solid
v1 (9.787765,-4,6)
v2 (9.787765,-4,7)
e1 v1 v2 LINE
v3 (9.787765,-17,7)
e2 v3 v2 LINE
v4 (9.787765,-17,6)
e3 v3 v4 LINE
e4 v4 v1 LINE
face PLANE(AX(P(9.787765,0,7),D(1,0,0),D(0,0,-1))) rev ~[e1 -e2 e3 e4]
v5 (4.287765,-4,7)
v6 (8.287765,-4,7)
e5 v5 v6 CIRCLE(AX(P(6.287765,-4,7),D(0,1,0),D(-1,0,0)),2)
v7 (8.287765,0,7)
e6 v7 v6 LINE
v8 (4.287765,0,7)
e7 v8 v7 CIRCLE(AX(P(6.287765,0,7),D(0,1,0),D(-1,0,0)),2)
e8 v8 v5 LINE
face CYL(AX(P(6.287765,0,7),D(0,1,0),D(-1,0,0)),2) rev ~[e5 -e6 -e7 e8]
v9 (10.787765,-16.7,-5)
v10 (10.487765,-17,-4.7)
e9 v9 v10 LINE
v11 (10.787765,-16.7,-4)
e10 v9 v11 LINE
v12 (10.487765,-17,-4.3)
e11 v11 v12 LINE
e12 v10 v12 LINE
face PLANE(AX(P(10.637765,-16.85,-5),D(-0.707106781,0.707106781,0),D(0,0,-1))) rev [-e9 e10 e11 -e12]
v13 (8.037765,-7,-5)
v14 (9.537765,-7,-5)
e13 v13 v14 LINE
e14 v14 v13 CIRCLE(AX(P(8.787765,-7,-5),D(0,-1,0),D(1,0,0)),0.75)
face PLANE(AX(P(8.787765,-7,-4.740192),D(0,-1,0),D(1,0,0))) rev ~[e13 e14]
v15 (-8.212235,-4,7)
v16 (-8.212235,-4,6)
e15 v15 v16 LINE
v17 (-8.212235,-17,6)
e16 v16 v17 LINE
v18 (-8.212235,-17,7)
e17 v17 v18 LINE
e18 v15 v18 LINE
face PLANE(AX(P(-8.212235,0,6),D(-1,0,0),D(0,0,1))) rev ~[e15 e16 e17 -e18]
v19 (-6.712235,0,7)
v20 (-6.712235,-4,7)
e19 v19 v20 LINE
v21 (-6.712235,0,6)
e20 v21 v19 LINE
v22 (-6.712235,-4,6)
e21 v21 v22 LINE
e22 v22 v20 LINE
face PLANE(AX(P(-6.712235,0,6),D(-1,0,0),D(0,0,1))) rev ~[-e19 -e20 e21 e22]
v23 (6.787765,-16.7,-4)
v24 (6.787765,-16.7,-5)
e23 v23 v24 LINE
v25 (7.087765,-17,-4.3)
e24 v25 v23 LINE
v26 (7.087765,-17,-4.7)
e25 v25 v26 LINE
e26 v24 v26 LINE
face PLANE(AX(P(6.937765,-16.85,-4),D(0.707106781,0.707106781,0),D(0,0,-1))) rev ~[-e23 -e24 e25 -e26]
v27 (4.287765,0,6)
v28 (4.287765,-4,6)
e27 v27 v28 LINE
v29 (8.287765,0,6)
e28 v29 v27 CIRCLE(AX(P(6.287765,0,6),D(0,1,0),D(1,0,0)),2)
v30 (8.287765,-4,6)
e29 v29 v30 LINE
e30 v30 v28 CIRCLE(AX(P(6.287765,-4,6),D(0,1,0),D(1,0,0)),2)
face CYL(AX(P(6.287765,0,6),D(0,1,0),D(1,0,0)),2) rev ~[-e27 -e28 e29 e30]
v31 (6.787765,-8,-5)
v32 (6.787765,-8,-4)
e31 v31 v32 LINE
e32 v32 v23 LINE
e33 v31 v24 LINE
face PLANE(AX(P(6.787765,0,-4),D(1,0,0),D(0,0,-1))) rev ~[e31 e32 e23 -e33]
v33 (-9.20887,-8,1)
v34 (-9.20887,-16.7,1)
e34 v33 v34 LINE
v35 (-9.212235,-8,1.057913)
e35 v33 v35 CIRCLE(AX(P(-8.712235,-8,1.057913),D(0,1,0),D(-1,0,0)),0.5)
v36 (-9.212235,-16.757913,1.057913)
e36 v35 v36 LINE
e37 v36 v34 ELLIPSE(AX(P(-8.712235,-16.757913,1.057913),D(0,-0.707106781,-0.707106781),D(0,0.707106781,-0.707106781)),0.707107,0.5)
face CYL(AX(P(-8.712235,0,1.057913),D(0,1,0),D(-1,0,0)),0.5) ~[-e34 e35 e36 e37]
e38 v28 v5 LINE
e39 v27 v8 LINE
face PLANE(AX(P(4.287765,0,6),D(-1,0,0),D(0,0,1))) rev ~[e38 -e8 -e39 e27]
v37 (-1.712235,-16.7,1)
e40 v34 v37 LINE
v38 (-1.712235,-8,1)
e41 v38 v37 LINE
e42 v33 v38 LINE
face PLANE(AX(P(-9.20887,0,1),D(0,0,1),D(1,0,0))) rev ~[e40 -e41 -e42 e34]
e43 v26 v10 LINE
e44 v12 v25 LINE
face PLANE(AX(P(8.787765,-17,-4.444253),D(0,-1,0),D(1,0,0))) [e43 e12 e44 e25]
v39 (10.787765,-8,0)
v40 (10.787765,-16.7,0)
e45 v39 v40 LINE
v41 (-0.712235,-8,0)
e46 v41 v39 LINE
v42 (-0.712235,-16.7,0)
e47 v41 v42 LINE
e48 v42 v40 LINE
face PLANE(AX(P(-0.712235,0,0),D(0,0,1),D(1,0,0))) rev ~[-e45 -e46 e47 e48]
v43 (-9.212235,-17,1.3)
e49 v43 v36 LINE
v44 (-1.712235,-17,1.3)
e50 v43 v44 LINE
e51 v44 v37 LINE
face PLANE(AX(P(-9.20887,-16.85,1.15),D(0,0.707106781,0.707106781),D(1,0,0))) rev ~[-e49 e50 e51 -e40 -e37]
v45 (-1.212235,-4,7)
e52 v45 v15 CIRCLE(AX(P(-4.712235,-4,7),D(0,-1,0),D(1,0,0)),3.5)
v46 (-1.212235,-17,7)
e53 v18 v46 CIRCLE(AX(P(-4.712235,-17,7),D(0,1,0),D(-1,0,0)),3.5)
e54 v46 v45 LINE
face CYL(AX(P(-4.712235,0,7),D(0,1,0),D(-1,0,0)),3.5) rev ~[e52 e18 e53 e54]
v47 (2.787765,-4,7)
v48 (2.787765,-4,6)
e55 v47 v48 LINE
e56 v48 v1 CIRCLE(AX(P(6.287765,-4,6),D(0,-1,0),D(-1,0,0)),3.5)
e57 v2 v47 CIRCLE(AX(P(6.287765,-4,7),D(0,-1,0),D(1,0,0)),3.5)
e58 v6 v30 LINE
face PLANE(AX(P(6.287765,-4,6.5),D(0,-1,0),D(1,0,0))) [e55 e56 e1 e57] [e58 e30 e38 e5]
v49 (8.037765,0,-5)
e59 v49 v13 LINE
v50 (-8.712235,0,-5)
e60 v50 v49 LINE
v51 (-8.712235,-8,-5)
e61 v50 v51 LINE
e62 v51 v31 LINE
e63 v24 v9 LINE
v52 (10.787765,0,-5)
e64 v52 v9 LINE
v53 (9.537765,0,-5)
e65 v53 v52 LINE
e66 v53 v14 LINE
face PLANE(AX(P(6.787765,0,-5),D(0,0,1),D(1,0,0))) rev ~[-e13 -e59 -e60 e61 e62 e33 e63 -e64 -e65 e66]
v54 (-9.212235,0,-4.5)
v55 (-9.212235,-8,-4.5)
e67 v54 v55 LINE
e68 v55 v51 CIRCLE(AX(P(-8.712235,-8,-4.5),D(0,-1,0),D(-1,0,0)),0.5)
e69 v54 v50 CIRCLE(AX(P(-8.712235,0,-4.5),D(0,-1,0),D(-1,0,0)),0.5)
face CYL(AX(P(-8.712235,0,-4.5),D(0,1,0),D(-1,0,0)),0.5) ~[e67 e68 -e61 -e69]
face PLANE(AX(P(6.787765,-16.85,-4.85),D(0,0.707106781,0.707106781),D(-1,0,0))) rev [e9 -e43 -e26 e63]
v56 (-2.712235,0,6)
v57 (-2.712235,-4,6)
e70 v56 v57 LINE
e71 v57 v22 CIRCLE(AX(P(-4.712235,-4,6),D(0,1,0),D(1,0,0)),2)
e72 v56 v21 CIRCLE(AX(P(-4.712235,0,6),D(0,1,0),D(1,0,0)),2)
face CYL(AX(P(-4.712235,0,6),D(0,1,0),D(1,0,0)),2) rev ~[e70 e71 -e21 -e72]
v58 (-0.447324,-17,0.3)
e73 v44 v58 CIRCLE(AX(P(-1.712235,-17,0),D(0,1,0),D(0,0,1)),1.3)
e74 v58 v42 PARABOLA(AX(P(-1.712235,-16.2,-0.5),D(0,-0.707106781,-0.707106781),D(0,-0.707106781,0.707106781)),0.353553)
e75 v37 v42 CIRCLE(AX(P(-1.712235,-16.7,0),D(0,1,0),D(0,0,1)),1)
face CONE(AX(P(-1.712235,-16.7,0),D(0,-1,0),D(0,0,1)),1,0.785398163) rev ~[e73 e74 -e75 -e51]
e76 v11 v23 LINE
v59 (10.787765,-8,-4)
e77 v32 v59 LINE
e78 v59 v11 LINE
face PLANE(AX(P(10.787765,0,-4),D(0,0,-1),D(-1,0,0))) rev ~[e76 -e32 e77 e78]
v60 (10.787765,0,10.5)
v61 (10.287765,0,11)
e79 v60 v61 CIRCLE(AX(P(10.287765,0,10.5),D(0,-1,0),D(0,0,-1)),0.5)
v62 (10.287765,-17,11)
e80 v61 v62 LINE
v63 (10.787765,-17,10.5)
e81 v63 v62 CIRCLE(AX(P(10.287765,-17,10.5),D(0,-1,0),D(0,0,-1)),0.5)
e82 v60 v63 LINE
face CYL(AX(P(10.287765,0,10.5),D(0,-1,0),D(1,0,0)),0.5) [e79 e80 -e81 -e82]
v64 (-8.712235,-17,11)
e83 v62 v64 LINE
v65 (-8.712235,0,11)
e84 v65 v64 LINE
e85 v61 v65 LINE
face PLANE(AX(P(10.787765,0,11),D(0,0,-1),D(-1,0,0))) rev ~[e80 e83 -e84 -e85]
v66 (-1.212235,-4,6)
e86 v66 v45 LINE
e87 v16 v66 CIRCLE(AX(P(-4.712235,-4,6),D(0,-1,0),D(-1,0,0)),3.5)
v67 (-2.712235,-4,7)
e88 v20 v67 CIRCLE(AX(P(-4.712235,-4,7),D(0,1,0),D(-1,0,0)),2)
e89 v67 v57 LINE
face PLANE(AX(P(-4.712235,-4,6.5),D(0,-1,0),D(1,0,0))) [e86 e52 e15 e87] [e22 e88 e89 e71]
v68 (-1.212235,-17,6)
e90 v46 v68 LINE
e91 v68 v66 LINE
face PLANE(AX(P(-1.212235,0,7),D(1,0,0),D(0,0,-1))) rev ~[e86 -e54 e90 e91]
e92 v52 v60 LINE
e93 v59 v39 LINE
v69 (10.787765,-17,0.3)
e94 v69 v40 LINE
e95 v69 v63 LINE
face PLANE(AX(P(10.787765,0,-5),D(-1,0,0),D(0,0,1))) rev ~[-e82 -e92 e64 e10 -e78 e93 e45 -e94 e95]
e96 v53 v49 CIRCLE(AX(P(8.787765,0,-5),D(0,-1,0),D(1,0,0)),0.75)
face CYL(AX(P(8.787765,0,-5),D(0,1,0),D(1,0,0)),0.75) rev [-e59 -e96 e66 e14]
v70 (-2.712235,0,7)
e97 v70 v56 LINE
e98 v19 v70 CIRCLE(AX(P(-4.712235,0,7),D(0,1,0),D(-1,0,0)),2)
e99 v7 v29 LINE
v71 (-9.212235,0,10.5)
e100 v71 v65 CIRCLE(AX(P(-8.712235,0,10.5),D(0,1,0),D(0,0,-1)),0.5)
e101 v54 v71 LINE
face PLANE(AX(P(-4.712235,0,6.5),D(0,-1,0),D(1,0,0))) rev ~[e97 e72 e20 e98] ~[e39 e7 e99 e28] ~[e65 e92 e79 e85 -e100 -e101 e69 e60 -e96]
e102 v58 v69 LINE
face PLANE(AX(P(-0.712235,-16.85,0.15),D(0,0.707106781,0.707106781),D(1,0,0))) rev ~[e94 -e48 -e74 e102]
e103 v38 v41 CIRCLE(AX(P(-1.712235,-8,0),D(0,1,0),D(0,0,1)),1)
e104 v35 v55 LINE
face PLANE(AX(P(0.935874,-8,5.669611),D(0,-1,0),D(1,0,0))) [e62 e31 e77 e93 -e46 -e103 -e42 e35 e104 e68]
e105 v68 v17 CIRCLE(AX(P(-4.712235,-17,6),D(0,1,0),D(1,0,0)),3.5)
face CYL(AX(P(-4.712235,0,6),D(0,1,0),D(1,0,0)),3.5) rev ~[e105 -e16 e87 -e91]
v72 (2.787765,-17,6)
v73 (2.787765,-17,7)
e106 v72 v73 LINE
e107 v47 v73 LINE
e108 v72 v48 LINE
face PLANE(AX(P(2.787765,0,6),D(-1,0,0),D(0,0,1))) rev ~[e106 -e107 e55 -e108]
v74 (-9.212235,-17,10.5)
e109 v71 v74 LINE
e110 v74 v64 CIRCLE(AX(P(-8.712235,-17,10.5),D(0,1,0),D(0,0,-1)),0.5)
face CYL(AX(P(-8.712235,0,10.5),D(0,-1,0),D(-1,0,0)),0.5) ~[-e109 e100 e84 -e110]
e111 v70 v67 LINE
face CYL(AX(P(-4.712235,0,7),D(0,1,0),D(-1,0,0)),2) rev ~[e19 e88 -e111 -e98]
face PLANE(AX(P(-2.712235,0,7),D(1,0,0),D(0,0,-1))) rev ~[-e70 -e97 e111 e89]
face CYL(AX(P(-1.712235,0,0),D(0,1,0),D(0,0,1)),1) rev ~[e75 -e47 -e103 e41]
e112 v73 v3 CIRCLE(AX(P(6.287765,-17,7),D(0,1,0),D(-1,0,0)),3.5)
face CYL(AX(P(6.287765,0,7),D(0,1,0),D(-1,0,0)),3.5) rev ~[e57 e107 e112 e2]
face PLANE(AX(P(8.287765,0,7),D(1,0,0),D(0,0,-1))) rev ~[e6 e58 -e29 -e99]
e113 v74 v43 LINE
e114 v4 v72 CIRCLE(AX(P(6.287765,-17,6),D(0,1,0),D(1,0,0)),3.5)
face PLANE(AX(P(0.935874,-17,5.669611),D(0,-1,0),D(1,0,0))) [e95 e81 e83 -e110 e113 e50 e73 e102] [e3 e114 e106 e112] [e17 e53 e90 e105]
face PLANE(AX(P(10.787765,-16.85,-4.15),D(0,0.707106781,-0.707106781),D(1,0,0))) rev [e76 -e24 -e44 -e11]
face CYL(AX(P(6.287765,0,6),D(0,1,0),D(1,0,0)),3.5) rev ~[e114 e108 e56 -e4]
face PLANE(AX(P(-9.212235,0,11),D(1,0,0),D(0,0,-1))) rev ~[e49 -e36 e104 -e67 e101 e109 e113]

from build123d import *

# Parameters (mm, degrees)
F1_DEPTH = 17
F2_DEPTH = 8
F3_DEPTH = 17
F4_R     = 0.5
F5_DEPTH = 4
F6_SIZE  = 0.3
F7_DEPTH = 7
F8_DEPTH = 4


with BuildPart() as f1:
    # F0 (on Front) → F1 (new body)
    with BuildSketch(Plane.XZ):
        with BuildLine():
            Line((10.7877647579, 0), (10.7877647579, 11))
            Line((10.7877647579, 11), (-9.2122352421, 11))
            Line((-9.2122352421, 11), (-9.2122352421, 1.0579130137))
            ThreePointArc((-9.2122352421, 1.0579130137), (-9.2113932226, 1.0289076607), (-9.2088700001, 1))
            Line((-9.2088700001, 1), (-1.7122352421, 1))
            ThreePointArc((-1.7122352421, 1), (-1.0051284609, 0.7071067812), (-0.7122352421, 0))
            Line((-0.7122352421, 0), (0, 0))
            Line((0, 0), (10.7877647579, 0))
        make_face()
        with BuildLine():
            Line((-8.2122352421, 6), (-8.2122352421, 7))
            ThreePointArc((-8.2122352421, 7), (-4.7122352421, 10.5), (-1.2122352421, 7))
            Line((-1.2122352421, 7), (-1.2122352421, 6))
            ThreePointArc((-1.2122352421, 6), (-4.7122352421, 2.5), (-8.2122352421, 6))
        make_face(mode=Mode.SUBTRACT)
        with BuildLine():
            ThreePointArc((2.7877647579, 7), (6.2877647579, 10.5), (9.7877647579, 7))
            Line((9.7877647579, 7), (9.7877647579, 6))
            ThreePointArc((9.7877647579, 6), (6.2877647579, 2.5), (2.7877647579, 6))
            Line((2.7877647579, 6), (2.7877647579, 7))
        make_face(mode=Mode.SUBTRACT)
    extrude(amount=F1_DEPTH)

    # F0 (on Front) → F2 (join)
    with BuildSketch(Plane.XZ):
        with BuildLine():
            Line((10.7877647579, 0), (10.7877647579, 11))
            Line((10.7877647579, 11), (-9.2122352421, 11))
            Line((-9.2122352421, 11), (-9.2122352421, 1.0579130137))
            ThreePointArc((-9.2122352421, 1.0579130137), (-9.2113932226, 1.0289076607), (-9.2088700001, 1))
            Line((-9.2088700001, 1), (-1.7122352421, 1))
            ThreePointArc((-1.7122352421, 1), (-1.0051284609, 0.7071067812), (-0.7122352421, 0))
            Line((-0.7122352421, 0), (0, 0))
            Line((0, 0), (10.7877647579, 0))
        make_face()
        with BuildLine():
            Line((-8.2122352421, 6), (-8.2122352421, 7))
            ThreePointArc((-8.2122352421, 7), (-4.7122352421, 10.5), (-1.2122352421, 7))
            Line((-1.2122352421, 7), (-1.2122352421, 6))
            ThreePointArc((-1.2122352421, 6), (-4.7122352421, 2.5), (-8.2122352421, 6))
        make_face(mode=Mode.SUBTRACT)
        with BuildLine():
            ThreePointArc((2.7877647579, 7), (6.2877647579, 10.5), (9.7877647579, 7))
            Line((9.7877647579, 7), (9.7877647579, 6))
            ThreePointArc((9.7877647579, 6), (6.2877647579, 2.5), (2.7877647579, 6))
            Line((2.7877647579, 6), (2.7877647579, 7))
        make_face(mode=Mode.SUBTRACT)
        with BuildLine():
            Line((10.7877647579, -4), (10.7877647579, 0))
            Line((10.7877647579, 0), (0, 0))
            Line((0, 0), (-0.7122352421, 0))
            ThreePointArc((-0.7122352421, 0), (-1.0051284609, 0.7071067812), (-1.7122352421, 1))
            Line((-1.7122352421, 1), (-9.2088700001, 1))
            ThreePointArc((-9.2088700001, 1), (-9.2113932226, 1.0289076607), (-9.2122352421, 1.0579130137))
            Line((-9.2122352421, 1.0579130137), (-9.2122352421, -4.5))
            ThreePointArc((-9.2122352421, -4.5), (-9.0657886327, -4.8535533906), (-8.7122352421, -5))
            Line((-8.7122352421, -5), (6.7877647579, -5))
            Line((6.7877647579, -5), (6.7877647579, -4))
            Line((6.7877647579, -4), (10.7877647579, -4))
        make_face()
    extrude(amount=F2_DEPTH)

    # F0 (on Front) → F3 (join)
    with BuildSketch(Plane.XZ):
        with BuildLine():
            Line((10.7877647579, -5), (10.7877647579, -4))
            Line((10.7877647579, -4), (6.7877647579, -4))
            Line((6.7877647579, -4), (6.7877647579, -5))
            Line((6.7877647579, -5), (8.0377647579, -5))
            ThreePointArc((8.0377647579, -5), (8.7877647579, -4.25), (9.5377647579, -5))
            Line((9.5377647579, -5), (10.7877647579, -5))
        make_face()
        with BuildLine():
            Line((8.0377647579, -5), (9.5377647579, -5))
            ThreePointArc((9.5377647579, -5), (8.7877647579, -4.25), (8.0377647579, -5))
        make_face()
    extrude(amount=F3_DEPTH)

    # F4
    f4_edges = [f1.edges().sort_by_distance(p)[0] for p in [
        (-9.212235, -8.5, 11),
        (10.787765, -8.5, 11),
    ]]
    fillet(f4_edges, radius=F4_R)

    # F0 (on Front) → F5 (join)
    with BuildSketch(Plane.XZ):
        with BuildLine():
            Line((9.7877647579, 6), (9.7877647579, 7))
            ThreePointArc((9.7877647579, 7), (6.2877647579, 10.5), (2.7877647579, 7))
            Line((2.7877647579, 7), (2.7877647579, 6))
            ThreePointArc((2.7877647579, 6), (6.2877647579, 2.5), (9.7877647579, 6))
        make_face()
        with BuildLine():
            ThreePointArc((4.2877647579, 7), (6.2877647579, 9), (8.2877647579, 7))
            Line((8.2877647579, 7), (8.2877647579, 6))
            ThreePointArc((8.2877647579, 6), (6.2877647579, 4), (4.2877647579, 6))
            Line((4.2877647579, 6), (4.2877647579, 7))
        make_face(mode=Mode.SUBTRACT)
    extrude(amount=F5_DEPTH)

    # F6
    f6_edges = [f1.edges().sort_by_distance(p)[0] for p in [
        (-5.460553, -17, 1),
        (-1.005128, -17, 0.707107),
        (5.037765, -17, 0),
        (8.787765, -17, -5),
        (6.787765, -17, -4.5),
        (8.787765, -17, -4),
        (10.787765, -17, -4.5),
    ]]
    chamfer(f6_edges, length=F6_SIZE)

    # F0 (on Front) → F7 (cut)
    with BuildSketch(Plane.XZ):
        with BuildLine():
            Line((8.0377647579, -5), (9.5377647579, -5))
            ThreePointArc((9.5377647579, -5), (8.7877647579, -4.25), (8.0377647579, -5))
        make_face()
    extrude(amount=F7_DEPTH, mode=Mode.SUBTRACT)

    # F0 (on Front) → F8 (join)
    with BuildSketch(Plane.XZ):
        with BuildLine():
            ThreePointArc((-1.2122352421, 7), (-4.7122352421, 10.5), (-8.2122352421, 7))
            Line((-8.2122352421, 7), (-8.2122352421, 6))
            ThreePointArc((-8.2122352421, 6), (-4.7122352421, 2.5), (-1.2122352421, 6))
            Line((-1.2122352421, 6), (-1.2122352421, 7))
        make_face()
        with BuildLine():
            Line((-2.7122352421, 7), (-2.7122352421, 6))
            ThreePointArc((-2.7122352421, 6), (-4.7122352421, 4), (-6.7122352421, 6))
            Line((-6.7122352421, 6), (-6.7122352421, 7))
            ThreePointArc((-6.7122352421, 7), (-4.7122352421, 9), (-2.7122352421, 7))
        make_face(mode=Mode.SUBTRACT)
    extrude(amount=F8_DEPTH)


solid = f1.part
